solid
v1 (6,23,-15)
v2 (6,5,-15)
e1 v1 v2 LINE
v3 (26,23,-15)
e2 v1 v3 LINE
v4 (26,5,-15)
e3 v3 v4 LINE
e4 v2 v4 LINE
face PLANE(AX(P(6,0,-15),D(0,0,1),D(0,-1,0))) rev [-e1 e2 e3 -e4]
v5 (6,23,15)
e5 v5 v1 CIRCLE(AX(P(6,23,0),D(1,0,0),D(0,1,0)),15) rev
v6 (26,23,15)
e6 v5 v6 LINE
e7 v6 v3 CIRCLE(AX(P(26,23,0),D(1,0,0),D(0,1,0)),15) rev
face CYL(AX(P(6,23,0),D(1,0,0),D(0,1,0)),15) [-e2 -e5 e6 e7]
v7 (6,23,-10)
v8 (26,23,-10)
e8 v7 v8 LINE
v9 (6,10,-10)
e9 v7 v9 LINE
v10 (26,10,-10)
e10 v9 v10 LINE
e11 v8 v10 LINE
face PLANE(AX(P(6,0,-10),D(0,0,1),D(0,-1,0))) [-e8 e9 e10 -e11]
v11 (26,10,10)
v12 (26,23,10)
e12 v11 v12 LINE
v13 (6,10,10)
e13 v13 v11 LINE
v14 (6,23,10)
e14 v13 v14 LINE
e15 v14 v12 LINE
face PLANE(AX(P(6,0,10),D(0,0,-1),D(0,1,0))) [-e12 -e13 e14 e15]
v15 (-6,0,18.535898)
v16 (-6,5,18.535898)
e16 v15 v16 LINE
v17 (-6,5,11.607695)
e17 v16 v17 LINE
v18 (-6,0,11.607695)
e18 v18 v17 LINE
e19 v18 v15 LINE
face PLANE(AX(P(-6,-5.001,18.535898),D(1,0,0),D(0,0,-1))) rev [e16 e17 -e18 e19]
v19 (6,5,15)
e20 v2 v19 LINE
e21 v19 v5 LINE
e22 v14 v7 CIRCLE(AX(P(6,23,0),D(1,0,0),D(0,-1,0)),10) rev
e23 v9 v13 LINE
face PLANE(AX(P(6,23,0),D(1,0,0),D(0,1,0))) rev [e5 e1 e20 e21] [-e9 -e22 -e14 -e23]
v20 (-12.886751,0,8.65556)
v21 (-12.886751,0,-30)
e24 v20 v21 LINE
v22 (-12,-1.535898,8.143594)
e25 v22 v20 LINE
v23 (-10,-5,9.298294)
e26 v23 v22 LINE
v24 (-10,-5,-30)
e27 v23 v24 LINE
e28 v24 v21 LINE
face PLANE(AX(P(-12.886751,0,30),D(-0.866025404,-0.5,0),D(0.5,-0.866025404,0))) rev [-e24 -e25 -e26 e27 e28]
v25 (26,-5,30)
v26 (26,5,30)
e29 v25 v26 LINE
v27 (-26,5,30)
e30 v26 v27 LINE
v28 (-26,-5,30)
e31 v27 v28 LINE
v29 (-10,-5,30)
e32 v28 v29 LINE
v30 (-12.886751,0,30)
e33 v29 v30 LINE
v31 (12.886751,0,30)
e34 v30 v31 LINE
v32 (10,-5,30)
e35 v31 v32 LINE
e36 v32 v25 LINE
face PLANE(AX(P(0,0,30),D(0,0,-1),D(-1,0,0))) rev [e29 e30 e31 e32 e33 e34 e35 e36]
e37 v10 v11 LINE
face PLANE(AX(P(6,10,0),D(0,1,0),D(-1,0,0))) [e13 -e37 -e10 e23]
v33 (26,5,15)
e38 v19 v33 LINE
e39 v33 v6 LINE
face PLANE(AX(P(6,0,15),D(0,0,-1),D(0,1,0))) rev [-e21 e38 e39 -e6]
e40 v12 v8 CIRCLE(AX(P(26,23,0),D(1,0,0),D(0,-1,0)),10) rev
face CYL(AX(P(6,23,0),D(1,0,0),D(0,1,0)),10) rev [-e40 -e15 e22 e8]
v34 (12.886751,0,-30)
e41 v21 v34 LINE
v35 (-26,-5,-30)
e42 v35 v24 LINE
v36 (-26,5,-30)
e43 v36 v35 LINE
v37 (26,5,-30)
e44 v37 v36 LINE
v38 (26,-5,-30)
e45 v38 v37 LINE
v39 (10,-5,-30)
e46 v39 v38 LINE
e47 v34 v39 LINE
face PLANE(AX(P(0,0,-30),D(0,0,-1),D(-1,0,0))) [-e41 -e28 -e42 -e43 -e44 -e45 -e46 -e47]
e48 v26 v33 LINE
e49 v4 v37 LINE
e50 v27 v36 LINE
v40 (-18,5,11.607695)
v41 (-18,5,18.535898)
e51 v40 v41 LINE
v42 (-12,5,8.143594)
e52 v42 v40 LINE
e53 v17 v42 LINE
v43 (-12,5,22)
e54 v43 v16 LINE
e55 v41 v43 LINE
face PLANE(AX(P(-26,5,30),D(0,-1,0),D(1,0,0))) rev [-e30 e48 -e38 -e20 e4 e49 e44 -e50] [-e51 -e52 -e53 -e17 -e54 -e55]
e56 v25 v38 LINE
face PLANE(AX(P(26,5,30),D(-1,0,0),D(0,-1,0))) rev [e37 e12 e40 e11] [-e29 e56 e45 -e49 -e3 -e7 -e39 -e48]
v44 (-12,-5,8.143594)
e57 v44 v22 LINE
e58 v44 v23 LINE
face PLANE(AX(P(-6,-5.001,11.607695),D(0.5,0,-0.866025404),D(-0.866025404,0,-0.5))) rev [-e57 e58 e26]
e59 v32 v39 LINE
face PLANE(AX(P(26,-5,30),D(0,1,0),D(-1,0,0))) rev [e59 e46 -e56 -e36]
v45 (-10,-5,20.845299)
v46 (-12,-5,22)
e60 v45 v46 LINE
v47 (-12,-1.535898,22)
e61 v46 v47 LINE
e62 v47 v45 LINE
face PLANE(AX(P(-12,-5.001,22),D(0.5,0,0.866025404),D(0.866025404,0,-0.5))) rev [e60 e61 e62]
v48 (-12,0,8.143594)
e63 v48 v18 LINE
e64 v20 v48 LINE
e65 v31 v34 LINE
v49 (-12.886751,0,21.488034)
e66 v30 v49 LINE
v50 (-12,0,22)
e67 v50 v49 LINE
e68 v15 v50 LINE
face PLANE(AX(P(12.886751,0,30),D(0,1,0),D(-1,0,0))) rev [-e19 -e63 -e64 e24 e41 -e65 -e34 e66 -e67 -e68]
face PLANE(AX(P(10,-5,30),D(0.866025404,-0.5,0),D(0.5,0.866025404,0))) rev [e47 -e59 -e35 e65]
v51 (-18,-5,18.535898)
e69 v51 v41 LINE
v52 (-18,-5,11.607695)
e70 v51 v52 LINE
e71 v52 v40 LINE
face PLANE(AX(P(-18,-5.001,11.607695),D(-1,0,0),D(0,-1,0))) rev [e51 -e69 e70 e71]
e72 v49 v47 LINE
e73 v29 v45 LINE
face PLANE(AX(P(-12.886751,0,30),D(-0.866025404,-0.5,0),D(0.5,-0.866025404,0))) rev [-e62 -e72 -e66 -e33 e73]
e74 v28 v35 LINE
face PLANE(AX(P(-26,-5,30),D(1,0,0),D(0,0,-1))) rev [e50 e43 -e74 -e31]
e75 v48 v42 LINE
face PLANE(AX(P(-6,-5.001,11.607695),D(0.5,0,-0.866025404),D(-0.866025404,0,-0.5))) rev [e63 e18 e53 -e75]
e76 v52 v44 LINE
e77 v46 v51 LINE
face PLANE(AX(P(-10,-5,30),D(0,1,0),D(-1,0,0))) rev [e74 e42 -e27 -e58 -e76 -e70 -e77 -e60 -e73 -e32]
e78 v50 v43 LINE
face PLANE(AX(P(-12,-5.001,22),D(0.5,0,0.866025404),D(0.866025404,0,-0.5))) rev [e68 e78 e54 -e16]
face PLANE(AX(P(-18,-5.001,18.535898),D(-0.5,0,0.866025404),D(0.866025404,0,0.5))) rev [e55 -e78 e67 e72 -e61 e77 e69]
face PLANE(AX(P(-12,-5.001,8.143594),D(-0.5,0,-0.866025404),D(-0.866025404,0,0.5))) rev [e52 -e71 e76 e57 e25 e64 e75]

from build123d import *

# Parameters (mm, degrees)
EXTRUDE_2_DEPTH     = 30
EXTRUDE_START       = -20
EXTRUDE_1_DEPTH     = 20
CUT_EXTRUDE_1_REACH = 53.624


# Read off the part's stored shape, not the designer's step: 拉伸-薄壁1
with BuildPart() as part:
    # 草图1 → 凸台-拉伸2 (new, symmetric)
    with BuildSketch(Plane.XY):
        Polygon((-26, 5), (26, 5), (26, -5), (10, -5), (12.886751346, 0), (-12.886751346, 0), (-10, -5), (-26, -5), align=None)
    extrude(amount=EXTRUDE_2_DEPTH, both=True)

    # 拉伸-薄壁1 outline → 拉伸-薄壁1 (add)
    with BuildSketch(Plane(origin=(26, 0, 0), x_dir=(0, 0, -1), z_dir=(1, 0, 0)).offset(EXTRUDE_START)):
        with BuildLine():
            Line((15, 5), (15, 23))
            ThreePointArc((15, 23), (0, 38), (-15, 23))
            Line((-15, 23), (-15, 5))
            Line((-15, 5), (15, 5))
        make_face()
        with BuildLine():
            ThreePointArc((-10, 23), (0, 33), (10, 23))
            Line((10, 23), (10, 10))
            Line((10, 10), (-10, 10))
            Line((-10, 10), (-10, 23))
        make_face(mode=Mode.SUBTRACT)
    extrude(amount=EXTRUDE_1_DEPTH)

    # 草图6 → 切除-拉伸1 (cut, up to next)
    with BuildSketch(Plane(origin=(0, 5, 0), x_dir=(1, 0, 0), z_dir=(0, 1, 0)), mode=Mode.PRIVATE) as cut_extrude_1_sk1:
        Polygon((-6, -11.607695155), (-12, -8.143593539), (-18, -11.607695155), (-18, -18.535898385), (-12, -22), (-6, -18.535898385), align=None)
    cut_extrude_1_tool1 = extrude(cut_extrude_1_sk1.sketch, amount=-CUT_EXTRUDE_1_REACH, mode=Mode.PRIVATE) & part.part
    add(cut_extrude_1_tool1.solids().sort_by_distance((-12, 5, 15.071797))[0], mode=Mode.SUBTRACT)


solid = part.part
